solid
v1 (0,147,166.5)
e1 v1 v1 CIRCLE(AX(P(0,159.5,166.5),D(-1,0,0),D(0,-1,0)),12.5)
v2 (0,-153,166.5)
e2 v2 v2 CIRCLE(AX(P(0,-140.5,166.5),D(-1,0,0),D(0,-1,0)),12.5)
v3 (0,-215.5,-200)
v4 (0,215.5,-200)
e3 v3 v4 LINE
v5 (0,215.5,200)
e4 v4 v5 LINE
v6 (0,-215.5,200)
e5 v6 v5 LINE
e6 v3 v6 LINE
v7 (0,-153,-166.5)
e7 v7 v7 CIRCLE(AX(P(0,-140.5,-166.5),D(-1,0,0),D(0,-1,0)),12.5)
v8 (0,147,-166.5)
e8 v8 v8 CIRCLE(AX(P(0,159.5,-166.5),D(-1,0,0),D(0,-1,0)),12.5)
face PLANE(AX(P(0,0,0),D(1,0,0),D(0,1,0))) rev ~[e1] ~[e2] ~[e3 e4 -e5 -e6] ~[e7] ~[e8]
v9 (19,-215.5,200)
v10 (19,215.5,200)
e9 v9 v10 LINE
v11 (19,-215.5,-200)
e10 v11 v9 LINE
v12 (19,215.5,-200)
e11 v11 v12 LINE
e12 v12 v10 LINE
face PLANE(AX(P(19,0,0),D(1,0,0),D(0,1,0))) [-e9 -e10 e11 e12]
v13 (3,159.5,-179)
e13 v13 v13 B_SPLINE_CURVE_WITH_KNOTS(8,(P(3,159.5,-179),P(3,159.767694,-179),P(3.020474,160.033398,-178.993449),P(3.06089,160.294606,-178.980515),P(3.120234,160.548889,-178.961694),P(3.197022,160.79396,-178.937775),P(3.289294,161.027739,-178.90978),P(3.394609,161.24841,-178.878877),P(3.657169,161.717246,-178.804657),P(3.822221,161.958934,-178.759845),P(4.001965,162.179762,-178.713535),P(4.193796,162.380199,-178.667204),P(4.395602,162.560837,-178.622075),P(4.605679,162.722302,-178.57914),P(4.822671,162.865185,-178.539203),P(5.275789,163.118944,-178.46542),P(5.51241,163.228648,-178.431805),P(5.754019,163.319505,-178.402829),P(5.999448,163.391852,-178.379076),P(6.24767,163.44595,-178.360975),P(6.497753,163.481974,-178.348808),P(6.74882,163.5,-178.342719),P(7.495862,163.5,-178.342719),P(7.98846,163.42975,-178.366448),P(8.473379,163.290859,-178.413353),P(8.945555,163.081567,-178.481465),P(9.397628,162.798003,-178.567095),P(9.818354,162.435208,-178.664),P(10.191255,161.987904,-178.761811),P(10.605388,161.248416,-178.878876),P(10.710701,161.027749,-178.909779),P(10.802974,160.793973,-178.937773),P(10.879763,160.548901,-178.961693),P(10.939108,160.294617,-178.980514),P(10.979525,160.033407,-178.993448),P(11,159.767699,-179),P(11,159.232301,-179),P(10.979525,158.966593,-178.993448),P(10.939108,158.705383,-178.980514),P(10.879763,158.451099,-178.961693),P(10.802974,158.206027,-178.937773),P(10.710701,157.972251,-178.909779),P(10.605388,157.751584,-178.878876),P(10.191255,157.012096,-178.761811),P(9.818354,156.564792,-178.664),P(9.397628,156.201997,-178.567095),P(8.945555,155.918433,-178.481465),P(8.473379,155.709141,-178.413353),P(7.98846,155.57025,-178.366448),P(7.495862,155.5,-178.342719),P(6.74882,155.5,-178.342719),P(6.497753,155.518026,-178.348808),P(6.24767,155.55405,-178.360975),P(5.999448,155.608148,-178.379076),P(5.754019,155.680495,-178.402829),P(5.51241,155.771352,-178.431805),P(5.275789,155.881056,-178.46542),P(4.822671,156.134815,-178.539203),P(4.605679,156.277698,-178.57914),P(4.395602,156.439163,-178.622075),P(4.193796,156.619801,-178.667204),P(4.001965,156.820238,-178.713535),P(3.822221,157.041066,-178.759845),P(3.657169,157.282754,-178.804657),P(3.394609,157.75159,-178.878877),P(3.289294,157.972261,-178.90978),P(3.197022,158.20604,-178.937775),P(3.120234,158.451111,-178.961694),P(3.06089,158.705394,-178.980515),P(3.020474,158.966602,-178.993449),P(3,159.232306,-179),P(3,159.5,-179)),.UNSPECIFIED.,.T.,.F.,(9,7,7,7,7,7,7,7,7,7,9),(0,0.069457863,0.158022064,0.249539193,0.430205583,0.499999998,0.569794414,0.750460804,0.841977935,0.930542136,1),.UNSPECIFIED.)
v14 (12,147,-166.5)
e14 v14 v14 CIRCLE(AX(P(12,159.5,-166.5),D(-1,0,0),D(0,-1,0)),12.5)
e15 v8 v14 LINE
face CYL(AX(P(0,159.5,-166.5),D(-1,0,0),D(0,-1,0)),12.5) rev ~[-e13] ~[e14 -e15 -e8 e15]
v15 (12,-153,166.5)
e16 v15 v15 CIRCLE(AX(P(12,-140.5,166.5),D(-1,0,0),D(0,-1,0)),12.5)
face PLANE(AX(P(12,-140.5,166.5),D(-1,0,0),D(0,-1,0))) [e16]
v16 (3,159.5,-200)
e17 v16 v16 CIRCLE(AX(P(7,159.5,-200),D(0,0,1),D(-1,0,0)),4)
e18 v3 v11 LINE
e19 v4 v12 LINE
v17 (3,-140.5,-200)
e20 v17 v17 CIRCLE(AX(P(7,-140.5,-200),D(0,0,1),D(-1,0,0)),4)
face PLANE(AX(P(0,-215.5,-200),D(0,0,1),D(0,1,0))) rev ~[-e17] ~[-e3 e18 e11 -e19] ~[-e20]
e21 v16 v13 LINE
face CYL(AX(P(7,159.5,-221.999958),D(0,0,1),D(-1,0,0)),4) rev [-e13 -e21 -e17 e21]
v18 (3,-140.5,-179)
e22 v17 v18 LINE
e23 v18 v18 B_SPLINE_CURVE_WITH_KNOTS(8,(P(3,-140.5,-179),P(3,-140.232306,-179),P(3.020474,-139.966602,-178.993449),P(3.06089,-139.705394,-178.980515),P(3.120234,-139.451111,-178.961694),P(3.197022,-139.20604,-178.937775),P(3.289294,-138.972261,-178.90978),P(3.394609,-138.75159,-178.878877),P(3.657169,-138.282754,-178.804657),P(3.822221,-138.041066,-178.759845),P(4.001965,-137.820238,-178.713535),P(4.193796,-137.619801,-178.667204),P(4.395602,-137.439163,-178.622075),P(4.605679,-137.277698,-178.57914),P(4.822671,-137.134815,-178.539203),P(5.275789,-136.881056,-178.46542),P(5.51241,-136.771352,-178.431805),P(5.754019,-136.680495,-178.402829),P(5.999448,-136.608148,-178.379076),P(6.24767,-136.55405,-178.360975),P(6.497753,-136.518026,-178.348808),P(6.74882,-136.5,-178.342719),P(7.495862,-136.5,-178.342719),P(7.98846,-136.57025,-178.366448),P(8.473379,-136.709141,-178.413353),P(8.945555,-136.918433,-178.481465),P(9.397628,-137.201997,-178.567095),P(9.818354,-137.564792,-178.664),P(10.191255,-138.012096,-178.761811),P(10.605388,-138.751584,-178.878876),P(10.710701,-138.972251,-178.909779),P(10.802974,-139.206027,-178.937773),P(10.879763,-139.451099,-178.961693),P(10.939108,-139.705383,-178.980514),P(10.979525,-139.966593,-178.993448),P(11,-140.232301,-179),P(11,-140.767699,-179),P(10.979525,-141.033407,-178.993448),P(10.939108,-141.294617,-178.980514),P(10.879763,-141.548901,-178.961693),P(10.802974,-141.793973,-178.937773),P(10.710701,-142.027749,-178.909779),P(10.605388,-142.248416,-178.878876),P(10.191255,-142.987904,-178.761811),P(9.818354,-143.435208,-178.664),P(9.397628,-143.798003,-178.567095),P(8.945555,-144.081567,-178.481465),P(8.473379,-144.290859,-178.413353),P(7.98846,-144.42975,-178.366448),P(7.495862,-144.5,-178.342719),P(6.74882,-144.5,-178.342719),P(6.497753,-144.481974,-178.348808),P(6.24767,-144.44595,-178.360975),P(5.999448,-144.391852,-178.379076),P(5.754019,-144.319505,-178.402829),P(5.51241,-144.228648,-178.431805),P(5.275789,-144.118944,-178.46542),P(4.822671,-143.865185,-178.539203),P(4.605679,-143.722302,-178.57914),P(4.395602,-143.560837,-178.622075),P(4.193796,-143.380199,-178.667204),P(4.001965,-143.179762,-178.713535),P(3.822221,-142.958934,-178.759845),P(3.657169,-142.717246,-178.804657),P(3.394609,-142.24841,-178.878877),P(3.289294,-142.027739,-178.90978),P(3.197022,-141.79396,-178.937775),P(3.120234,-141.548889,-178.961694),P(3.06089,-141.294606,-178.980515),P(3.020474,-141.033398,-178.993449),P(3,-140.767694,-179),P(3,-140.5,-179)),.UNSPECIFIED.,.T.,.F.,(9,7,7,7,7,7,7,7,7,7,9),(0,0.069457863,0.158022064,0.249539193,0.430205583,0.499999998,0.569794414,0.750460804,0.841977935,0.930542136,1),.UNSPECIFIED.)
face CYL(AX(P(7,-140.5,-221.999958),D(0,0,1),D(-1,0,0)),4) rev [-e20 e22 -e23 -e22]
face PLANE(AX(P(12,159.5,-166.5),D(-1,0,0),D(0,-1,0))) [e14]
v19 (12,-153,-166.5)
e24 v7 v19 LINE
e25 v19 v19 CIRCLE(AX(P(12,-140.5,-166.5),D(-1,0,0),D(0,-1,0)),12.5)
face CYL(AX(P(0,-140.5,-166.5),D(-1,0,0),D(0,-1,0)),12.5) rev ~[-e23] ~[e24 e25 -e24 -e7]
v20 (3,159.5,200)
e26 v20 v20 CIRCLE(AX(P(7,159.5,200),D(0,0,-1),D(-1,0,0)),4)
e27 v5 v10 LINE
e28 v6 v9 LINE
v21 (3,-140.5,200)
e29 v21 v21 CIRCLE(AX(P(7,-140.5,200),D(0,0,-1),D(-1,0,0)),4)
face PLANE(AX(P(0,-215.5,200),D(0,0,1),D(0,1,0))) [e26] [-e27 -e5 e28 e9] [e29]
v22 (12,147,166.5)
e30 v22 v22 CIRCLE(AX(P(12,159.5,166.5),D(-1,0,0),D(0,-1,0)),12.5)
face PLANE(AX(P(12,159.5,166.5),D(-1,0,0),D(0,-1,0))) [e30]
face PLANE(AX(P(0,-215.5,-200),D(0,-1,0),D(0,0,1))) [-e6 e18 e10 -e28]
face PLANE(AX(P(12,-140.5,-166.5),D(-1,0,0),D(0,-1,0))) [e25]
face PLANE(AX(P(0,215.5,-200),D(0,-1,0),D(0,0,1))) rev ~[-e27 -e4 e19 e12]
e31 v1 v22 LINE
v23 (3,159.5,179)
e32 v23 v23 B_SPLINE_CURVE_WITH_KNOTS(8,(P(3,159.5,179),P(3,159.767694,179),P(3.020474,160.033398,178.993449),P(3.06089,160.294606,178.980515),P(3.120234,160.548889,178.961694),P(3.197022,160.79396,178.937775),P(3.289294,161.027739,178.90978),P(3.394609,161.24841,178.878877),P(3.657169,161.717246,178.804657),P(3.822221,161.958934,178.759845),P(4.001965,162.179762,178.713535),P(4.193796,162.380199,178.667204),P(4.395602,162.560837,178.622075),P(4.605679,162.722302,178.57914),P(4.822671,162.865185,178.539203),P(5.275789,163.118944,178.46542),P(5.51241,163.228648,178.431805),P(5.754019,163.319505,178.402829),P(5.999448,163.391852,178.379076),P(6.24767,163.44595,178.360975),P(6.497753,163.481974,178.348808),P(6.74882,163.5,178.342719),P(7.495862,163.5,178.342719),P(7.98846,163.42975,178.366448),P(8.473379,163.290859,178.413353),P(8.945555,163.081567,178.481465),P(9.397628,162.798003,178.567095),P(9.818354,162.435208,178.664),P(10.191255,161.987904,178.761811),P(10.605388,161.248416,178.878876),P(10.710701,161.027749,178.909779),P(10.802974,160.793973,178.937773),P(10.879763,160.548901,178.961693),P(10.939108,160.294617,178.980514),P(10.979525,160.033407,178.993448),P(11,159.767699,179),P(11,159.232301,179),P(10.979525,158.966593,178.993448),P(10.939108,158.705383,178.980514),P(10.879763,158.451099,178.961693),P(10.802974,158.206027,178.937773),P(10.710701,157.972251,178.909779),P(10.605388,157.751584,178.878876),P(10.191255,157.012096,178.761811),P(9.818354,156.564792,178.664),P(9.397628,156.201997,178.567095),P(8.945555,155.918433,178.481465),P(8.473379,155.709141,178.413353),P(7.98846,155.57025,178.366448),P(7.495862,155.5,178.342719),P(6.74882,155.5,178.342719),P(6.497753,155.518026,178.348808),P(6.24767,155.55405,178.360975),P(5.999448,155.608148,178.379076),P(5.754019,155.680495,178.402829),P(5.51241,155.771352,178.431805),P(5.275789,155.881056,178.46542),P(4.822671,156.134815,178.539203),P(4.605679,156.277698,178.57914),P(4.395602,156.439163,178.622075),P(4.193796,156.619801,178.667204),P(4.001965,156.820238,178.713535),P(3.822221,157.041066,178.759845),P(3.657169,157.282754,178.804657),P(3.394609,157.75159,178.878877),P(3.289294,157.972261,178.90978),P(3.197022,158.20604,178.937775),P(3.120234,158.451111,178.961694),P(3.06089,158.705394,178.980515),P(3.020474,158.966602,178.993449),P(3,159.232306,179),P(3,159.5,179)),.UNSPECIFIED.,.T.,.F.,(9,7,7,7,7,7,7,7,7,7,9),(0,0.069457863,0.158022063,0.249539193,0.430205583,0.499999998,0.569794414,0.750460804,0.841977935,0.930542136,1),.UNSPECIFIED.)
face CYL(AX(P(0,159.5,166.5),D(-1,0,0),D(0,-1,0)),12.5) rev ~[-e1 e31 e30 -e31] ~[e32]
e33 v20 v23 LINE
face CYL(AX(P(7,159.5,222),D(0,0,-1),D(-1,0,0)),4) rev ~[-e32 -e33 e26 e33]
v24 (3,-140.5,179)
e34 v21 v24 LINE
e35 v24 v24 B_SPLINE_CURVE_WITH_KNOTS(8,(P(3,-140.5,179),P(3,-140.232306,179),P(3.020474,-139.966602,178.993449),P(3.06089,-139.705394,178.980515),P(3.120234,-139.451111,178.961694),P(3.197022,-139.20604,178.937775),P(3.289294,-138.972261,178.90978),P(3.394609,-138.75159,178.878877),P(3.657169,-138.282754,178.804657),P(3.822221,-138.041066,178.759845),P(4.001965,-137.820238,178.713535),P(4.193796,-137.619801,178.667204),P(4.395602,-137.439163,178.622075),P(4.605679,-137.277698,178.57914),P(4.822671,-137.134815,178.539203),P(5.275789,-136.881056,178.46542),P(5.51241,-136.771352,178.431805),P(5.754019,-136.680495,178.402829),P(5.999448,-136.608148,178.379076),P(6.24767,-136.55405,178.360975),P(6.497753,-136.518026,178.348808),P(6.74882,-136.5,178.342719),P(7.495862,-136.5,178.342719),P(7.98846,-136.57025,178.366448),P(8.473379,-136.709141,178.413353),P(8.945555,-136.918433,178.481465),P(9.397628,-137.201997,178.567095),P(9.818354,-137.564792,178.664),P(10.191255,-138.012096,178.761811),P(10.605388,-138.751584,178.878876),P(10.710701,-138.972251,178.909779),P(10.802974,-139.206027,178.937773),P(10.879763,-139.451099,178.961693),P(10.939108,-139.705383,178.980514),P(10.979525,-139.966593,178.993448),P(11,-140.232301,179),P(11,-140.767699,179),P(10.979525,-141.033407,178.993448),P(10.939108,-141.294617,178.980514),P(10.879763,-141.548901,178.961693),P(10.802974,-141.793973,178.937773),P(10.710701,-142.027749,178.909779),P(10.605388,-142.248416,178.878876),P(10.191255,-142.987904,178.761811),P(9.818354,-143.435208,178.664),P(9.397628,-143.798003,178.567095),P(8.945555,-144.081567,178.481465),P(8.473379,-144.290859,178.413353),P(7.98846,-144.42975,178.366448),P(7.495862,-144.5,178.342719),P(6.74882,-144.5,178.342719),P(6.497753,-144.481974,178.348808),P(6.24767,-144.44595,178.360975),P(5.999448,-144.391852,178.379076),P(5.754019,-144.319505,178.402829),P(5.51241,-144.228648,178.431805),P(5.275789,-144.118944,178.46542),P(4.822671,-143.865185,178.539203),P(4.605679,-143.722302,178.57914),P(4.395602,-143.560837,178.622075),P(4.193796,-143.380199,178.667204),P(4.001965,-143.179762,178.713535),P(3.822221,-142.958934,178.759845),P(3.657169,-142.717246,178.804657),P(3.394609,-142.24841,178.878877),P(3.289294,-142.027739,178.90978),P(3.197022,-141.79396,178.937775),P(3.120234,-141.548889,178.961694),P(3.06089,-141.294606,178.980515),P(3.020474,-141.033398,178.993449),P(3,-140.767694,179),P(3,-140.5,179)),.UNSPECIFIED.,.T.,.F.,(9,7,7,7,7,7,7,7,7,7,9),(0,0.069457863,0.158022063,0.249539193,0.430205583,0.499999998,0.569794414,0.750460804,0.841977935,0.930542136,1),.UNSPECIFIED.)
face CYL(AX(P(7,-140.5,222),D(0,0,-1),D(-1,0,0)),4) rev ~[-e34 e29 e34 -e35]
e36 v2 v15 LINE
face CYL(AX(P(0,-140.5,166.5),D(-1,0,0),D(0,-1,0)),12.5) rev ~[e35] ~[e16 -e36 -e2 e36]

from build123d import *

# Parameters (mm, degrees)
F0_W     = 431
F0_H     = 400
F1_DEPTH = 19
F2_R     = 12.5
F3_DEPTH = 12
F5_D     = 8
F5_DEPTH = 22
F5_TIP   = 2.4034424761


# Not quite as in the source:
# - a pattern or mirror of a feature is missing from the dataset's text; its kind, count and spacing are read off the source's solid


with BuildPart() as f1:
    # F0 (on Right) → F1 (new body)
    with BuildSketch(Plane.YZ):
        Rectangle(F0_W, F0_H)
    extrude(amount=F1_DEPTH)

    # F2 (on face) → F3 (cut)
    with BuildSketch(Plane(origin=(0, 0, 0), x_dir=(0, -1, 0), z_dir=(-1, 0, 0))):
        with Locations((-159.5, 166.5)):
            Circle(F2_R)
        with Locations((140.5, 166.5)):
            Circle(F2_R)
        with Locations((140.5, -166.5)):
            Circle(F2_R)
        with Locations((-159.5, -166.5)):
            Circle(F2_R)
    extrude(amount=-F3_DEPTH, mode=Mode.SUBTRACT)

    # F5
    with Locations(Plane.XY.offset(200)):
        with Locations((7, 159.5), (7, -140.5)):
            f5 = Hole(F5_D / 2, depth=F5_DEPTH)
            with Locations((0, 0, -(F5_DEPTH + F5_TIP / 2))):  # 118° drill point
                Cone(0, F5_D / 2, F5_TIP, mode=Mode.SUBTRACT)

    # F5_copies: F5 across plane
    add(f5.mirror(Plane(origin=(0, 0, 2.1e-05), x_dir=(-1, 0, 0), z_dir=(0, 0, -1))), mode=Mode.SUBTRACT)


solid = f1.part
